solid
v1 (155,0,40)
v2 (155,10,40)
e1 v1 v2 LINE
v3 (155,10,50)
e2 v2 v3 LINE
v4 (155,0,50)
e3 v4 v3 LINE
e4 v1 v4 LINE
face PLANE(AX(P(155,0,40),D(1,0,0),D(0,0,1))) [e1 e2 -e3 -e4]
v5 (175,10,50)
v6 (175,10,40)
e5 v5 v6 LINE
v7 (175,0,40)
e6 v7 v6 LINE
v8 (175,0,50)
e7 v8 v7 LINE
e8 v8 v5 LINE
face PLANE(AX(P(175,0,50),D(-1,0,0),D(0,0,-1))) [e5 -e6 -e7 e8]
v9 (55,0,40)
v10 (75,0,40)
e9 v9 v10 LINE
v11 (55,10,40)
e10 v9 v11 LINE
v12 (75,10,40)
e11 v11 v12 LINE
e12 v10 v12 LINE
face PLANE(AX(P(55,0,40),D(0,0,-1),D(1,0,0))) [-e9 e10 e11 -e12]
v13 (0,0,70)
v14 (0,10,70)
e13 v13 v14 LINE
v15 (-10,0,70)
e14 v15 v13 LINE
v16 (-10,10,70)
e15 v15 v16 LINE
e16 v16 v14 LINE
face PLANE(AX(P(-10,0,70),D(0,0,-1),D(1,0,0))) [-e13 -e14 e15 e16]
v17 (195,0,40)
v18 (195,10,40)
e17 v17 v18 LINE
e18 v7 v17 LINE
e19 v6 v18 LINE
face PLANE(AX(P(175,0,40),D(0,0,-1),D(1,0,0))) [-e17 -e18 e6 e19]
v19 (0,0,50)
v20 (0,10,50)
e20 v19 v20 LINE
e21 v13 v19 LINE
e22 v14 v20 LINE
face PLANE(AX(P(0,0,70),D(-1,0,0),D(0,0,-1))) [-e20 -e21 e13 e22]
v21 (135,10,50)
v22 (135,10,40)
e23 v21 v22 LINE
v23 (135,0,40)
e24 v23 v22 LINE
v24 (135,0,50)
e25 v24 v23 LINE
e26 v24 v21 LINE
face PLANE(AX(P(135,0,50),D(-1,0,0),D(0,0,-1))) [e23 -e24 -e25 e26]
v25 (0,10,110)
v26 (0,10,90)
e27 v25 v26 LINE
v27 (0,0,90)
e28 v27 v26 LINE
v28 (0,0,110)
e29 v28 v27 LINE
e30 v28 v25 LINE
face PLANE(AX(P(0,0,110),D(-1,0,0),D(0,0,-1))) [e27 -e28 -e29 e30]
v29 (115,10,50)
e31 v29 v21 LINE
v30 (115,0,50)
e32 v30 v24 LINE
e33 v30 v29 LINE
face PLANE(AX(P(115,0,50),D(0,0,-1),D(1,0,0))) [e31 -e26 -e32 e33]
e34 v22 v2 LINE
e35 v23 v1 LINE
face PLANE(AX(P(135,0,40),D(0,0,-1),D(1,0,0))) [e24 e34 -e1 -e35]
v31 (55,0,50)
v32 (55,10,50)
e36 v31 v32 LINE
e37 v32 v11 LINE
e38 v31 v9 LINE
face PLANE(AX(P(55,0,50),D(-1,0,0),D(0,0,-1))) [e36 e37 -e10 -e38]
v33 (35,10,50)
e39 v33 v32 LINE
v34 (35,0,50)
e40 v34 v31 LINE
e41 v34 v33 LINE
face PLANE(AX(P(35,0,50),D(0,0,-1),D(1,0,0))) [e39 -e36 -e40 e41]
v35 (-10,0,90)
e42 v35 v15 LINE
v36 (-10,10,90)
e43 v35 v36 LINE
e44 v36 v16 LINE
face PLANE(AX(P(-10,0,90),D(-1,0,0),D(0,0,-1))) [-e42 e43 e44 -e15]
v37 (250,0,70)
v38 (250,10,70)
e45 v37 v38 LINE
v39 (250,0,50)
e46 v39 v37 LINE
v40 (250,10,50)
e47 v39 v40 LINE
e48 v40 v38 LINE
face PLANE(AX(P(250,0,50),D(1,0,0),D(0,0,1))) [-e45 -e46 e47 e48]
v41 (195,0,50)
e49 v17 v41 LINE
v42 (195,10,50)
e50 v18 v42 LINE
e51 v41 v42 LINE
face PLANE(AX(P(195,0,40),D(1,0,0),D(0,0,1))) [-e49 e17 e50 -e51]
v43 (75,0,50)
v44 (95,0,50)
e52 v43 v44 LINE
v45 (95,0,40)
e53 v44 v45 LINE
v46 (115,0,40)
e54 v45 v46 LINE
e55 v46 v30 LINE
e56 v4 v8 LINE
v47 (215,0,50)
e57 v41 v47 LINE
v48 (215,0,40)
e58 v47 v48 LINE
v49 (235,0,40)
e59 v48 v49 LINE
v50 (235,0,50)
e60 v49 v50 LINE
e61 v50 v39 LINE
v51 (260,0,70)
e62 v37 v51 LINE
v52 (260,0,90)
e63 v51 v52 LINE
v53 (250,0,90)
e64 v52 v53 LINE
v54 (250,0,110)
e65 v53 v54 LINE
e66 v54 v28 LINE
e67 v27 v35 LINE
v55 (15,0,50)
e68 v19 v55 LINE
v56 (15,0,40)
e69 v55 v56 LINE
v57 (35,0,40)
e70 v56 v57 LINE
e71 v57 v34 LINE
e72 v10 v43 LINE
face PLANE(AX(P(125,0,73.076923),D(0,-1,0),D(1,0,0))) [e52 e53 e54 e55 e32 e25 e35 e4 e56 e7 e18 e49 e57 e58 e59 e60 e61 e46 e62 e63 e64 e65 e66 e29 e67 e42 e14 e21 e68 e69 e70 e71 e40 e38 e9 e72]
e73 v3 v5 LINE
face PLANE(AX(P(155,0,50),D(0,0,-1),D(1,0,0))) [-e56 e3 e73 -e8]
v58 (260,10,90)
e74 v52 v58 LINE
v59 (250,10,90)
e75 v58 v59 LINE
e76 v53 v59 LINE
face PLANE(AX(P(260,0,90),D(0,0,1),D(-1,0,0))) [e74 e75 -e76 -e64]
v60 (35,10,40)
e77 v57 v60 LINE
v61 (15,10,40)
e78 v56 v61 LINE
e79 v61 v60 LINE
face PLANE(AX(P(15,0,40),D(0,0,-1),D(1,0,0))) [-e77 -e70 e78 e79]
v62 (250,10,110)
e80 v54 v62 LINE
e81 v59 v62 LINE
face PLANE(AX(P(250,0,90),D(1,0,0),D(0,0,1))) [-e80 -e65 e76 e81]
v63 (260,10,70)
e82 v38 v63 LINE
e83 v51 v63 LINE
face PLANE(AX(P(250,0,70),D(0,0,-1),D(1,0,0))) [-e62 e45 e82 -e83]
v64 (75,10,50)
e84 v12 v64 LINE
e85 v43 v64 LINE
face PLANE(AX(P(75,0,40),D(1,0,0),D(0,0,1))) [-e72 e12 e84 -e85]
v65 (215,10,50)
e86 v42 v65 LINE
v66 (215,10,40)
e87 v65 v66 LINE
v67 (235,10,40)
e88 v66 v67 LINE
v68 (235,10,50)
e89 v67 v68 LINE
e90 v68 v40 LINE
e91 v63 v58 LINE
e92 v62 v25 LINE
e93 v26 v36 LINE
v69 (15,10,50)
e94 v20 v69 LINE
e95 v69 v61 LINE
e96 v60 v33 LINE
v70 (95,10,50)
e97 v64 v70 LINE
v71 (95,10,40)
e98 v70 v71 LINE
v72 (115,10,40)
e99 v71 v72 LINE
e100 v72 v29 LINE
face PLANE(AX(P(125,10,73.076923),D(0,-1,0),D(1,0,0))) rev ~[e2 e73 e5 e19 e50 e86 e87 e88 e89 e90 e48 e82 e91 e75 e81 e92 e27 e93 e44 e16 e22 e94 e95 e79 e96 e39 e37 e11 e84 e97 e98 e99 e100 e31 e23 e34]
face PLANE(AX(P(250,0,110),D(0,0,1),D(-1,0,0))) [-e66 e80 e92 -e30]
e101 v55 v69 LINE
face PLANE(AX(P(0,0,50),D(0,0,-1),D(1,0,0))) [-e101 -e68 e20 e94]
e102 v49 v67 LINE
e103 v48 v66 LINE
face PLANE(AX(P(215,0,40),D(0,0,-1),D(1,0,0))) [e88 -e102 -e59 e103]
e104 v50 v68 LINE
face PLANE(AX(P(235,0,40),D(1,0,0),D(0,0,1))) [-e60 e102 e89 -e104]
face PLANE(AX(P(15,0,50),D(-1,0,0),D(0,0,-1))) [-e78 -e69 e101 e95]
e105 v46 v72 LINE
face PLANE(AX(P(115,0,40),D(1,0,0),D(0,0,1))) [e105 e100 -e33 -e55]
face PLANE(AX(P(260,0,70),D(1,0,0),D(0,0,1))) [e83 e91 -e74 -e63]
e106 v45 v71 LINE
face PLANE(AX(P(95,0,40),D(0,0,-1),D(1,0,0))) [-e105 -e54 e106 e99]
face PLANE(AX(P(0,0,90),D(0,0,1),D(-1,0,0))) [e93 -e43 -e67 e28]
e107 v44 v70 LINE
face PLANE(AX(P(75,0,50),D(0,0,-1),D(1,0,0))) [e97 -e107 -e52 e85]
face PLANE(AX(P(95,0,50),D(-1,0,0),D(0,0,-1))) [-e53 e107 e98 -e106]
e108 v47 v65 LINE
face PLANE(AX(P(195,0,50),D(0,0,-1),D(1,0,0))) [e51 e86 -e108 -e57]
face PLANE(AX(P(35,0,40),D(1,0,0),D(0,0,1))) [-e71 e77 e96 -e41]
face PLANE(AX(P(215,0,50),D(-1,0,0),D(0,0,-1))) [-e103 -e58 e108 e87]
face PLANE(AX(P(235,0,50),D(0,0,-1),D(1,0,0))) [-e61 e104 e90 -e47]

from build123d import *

# Parameters (mm, degrees)
F1_DEPTH = 10


# Not quite as in the source:
# - a feature names something its author has since deleted; it is built from what else it names


with BuildPart() as f1:
    # F0 (on Front) → F1 (new body)
    with BuildSketch(Plane.XZ):
        Polygon((235, 50), (250, 50), (250, 70), (260, 70), (260, 90), (250, 90), (250, 110), (0, 110), (0, 90), (-10, 90), (-10, 70), (0, 70), (0, 50), (15, 50), (15, 40), (35, 40), (35, 50), (55, 50), (55, 40), (75, 40), (75, 50), (95, 50), (95, 40), (115, 40), (115, 50), (135, 50), (135, 40), (155, 40), (155, 50), (175, 50), (175, 40), (195, 40), (195, 50), (215, 50), (215, 40), (235, 40), align=None)
    extrude(amount=-F1_DEPTH)


solid = f1.part
